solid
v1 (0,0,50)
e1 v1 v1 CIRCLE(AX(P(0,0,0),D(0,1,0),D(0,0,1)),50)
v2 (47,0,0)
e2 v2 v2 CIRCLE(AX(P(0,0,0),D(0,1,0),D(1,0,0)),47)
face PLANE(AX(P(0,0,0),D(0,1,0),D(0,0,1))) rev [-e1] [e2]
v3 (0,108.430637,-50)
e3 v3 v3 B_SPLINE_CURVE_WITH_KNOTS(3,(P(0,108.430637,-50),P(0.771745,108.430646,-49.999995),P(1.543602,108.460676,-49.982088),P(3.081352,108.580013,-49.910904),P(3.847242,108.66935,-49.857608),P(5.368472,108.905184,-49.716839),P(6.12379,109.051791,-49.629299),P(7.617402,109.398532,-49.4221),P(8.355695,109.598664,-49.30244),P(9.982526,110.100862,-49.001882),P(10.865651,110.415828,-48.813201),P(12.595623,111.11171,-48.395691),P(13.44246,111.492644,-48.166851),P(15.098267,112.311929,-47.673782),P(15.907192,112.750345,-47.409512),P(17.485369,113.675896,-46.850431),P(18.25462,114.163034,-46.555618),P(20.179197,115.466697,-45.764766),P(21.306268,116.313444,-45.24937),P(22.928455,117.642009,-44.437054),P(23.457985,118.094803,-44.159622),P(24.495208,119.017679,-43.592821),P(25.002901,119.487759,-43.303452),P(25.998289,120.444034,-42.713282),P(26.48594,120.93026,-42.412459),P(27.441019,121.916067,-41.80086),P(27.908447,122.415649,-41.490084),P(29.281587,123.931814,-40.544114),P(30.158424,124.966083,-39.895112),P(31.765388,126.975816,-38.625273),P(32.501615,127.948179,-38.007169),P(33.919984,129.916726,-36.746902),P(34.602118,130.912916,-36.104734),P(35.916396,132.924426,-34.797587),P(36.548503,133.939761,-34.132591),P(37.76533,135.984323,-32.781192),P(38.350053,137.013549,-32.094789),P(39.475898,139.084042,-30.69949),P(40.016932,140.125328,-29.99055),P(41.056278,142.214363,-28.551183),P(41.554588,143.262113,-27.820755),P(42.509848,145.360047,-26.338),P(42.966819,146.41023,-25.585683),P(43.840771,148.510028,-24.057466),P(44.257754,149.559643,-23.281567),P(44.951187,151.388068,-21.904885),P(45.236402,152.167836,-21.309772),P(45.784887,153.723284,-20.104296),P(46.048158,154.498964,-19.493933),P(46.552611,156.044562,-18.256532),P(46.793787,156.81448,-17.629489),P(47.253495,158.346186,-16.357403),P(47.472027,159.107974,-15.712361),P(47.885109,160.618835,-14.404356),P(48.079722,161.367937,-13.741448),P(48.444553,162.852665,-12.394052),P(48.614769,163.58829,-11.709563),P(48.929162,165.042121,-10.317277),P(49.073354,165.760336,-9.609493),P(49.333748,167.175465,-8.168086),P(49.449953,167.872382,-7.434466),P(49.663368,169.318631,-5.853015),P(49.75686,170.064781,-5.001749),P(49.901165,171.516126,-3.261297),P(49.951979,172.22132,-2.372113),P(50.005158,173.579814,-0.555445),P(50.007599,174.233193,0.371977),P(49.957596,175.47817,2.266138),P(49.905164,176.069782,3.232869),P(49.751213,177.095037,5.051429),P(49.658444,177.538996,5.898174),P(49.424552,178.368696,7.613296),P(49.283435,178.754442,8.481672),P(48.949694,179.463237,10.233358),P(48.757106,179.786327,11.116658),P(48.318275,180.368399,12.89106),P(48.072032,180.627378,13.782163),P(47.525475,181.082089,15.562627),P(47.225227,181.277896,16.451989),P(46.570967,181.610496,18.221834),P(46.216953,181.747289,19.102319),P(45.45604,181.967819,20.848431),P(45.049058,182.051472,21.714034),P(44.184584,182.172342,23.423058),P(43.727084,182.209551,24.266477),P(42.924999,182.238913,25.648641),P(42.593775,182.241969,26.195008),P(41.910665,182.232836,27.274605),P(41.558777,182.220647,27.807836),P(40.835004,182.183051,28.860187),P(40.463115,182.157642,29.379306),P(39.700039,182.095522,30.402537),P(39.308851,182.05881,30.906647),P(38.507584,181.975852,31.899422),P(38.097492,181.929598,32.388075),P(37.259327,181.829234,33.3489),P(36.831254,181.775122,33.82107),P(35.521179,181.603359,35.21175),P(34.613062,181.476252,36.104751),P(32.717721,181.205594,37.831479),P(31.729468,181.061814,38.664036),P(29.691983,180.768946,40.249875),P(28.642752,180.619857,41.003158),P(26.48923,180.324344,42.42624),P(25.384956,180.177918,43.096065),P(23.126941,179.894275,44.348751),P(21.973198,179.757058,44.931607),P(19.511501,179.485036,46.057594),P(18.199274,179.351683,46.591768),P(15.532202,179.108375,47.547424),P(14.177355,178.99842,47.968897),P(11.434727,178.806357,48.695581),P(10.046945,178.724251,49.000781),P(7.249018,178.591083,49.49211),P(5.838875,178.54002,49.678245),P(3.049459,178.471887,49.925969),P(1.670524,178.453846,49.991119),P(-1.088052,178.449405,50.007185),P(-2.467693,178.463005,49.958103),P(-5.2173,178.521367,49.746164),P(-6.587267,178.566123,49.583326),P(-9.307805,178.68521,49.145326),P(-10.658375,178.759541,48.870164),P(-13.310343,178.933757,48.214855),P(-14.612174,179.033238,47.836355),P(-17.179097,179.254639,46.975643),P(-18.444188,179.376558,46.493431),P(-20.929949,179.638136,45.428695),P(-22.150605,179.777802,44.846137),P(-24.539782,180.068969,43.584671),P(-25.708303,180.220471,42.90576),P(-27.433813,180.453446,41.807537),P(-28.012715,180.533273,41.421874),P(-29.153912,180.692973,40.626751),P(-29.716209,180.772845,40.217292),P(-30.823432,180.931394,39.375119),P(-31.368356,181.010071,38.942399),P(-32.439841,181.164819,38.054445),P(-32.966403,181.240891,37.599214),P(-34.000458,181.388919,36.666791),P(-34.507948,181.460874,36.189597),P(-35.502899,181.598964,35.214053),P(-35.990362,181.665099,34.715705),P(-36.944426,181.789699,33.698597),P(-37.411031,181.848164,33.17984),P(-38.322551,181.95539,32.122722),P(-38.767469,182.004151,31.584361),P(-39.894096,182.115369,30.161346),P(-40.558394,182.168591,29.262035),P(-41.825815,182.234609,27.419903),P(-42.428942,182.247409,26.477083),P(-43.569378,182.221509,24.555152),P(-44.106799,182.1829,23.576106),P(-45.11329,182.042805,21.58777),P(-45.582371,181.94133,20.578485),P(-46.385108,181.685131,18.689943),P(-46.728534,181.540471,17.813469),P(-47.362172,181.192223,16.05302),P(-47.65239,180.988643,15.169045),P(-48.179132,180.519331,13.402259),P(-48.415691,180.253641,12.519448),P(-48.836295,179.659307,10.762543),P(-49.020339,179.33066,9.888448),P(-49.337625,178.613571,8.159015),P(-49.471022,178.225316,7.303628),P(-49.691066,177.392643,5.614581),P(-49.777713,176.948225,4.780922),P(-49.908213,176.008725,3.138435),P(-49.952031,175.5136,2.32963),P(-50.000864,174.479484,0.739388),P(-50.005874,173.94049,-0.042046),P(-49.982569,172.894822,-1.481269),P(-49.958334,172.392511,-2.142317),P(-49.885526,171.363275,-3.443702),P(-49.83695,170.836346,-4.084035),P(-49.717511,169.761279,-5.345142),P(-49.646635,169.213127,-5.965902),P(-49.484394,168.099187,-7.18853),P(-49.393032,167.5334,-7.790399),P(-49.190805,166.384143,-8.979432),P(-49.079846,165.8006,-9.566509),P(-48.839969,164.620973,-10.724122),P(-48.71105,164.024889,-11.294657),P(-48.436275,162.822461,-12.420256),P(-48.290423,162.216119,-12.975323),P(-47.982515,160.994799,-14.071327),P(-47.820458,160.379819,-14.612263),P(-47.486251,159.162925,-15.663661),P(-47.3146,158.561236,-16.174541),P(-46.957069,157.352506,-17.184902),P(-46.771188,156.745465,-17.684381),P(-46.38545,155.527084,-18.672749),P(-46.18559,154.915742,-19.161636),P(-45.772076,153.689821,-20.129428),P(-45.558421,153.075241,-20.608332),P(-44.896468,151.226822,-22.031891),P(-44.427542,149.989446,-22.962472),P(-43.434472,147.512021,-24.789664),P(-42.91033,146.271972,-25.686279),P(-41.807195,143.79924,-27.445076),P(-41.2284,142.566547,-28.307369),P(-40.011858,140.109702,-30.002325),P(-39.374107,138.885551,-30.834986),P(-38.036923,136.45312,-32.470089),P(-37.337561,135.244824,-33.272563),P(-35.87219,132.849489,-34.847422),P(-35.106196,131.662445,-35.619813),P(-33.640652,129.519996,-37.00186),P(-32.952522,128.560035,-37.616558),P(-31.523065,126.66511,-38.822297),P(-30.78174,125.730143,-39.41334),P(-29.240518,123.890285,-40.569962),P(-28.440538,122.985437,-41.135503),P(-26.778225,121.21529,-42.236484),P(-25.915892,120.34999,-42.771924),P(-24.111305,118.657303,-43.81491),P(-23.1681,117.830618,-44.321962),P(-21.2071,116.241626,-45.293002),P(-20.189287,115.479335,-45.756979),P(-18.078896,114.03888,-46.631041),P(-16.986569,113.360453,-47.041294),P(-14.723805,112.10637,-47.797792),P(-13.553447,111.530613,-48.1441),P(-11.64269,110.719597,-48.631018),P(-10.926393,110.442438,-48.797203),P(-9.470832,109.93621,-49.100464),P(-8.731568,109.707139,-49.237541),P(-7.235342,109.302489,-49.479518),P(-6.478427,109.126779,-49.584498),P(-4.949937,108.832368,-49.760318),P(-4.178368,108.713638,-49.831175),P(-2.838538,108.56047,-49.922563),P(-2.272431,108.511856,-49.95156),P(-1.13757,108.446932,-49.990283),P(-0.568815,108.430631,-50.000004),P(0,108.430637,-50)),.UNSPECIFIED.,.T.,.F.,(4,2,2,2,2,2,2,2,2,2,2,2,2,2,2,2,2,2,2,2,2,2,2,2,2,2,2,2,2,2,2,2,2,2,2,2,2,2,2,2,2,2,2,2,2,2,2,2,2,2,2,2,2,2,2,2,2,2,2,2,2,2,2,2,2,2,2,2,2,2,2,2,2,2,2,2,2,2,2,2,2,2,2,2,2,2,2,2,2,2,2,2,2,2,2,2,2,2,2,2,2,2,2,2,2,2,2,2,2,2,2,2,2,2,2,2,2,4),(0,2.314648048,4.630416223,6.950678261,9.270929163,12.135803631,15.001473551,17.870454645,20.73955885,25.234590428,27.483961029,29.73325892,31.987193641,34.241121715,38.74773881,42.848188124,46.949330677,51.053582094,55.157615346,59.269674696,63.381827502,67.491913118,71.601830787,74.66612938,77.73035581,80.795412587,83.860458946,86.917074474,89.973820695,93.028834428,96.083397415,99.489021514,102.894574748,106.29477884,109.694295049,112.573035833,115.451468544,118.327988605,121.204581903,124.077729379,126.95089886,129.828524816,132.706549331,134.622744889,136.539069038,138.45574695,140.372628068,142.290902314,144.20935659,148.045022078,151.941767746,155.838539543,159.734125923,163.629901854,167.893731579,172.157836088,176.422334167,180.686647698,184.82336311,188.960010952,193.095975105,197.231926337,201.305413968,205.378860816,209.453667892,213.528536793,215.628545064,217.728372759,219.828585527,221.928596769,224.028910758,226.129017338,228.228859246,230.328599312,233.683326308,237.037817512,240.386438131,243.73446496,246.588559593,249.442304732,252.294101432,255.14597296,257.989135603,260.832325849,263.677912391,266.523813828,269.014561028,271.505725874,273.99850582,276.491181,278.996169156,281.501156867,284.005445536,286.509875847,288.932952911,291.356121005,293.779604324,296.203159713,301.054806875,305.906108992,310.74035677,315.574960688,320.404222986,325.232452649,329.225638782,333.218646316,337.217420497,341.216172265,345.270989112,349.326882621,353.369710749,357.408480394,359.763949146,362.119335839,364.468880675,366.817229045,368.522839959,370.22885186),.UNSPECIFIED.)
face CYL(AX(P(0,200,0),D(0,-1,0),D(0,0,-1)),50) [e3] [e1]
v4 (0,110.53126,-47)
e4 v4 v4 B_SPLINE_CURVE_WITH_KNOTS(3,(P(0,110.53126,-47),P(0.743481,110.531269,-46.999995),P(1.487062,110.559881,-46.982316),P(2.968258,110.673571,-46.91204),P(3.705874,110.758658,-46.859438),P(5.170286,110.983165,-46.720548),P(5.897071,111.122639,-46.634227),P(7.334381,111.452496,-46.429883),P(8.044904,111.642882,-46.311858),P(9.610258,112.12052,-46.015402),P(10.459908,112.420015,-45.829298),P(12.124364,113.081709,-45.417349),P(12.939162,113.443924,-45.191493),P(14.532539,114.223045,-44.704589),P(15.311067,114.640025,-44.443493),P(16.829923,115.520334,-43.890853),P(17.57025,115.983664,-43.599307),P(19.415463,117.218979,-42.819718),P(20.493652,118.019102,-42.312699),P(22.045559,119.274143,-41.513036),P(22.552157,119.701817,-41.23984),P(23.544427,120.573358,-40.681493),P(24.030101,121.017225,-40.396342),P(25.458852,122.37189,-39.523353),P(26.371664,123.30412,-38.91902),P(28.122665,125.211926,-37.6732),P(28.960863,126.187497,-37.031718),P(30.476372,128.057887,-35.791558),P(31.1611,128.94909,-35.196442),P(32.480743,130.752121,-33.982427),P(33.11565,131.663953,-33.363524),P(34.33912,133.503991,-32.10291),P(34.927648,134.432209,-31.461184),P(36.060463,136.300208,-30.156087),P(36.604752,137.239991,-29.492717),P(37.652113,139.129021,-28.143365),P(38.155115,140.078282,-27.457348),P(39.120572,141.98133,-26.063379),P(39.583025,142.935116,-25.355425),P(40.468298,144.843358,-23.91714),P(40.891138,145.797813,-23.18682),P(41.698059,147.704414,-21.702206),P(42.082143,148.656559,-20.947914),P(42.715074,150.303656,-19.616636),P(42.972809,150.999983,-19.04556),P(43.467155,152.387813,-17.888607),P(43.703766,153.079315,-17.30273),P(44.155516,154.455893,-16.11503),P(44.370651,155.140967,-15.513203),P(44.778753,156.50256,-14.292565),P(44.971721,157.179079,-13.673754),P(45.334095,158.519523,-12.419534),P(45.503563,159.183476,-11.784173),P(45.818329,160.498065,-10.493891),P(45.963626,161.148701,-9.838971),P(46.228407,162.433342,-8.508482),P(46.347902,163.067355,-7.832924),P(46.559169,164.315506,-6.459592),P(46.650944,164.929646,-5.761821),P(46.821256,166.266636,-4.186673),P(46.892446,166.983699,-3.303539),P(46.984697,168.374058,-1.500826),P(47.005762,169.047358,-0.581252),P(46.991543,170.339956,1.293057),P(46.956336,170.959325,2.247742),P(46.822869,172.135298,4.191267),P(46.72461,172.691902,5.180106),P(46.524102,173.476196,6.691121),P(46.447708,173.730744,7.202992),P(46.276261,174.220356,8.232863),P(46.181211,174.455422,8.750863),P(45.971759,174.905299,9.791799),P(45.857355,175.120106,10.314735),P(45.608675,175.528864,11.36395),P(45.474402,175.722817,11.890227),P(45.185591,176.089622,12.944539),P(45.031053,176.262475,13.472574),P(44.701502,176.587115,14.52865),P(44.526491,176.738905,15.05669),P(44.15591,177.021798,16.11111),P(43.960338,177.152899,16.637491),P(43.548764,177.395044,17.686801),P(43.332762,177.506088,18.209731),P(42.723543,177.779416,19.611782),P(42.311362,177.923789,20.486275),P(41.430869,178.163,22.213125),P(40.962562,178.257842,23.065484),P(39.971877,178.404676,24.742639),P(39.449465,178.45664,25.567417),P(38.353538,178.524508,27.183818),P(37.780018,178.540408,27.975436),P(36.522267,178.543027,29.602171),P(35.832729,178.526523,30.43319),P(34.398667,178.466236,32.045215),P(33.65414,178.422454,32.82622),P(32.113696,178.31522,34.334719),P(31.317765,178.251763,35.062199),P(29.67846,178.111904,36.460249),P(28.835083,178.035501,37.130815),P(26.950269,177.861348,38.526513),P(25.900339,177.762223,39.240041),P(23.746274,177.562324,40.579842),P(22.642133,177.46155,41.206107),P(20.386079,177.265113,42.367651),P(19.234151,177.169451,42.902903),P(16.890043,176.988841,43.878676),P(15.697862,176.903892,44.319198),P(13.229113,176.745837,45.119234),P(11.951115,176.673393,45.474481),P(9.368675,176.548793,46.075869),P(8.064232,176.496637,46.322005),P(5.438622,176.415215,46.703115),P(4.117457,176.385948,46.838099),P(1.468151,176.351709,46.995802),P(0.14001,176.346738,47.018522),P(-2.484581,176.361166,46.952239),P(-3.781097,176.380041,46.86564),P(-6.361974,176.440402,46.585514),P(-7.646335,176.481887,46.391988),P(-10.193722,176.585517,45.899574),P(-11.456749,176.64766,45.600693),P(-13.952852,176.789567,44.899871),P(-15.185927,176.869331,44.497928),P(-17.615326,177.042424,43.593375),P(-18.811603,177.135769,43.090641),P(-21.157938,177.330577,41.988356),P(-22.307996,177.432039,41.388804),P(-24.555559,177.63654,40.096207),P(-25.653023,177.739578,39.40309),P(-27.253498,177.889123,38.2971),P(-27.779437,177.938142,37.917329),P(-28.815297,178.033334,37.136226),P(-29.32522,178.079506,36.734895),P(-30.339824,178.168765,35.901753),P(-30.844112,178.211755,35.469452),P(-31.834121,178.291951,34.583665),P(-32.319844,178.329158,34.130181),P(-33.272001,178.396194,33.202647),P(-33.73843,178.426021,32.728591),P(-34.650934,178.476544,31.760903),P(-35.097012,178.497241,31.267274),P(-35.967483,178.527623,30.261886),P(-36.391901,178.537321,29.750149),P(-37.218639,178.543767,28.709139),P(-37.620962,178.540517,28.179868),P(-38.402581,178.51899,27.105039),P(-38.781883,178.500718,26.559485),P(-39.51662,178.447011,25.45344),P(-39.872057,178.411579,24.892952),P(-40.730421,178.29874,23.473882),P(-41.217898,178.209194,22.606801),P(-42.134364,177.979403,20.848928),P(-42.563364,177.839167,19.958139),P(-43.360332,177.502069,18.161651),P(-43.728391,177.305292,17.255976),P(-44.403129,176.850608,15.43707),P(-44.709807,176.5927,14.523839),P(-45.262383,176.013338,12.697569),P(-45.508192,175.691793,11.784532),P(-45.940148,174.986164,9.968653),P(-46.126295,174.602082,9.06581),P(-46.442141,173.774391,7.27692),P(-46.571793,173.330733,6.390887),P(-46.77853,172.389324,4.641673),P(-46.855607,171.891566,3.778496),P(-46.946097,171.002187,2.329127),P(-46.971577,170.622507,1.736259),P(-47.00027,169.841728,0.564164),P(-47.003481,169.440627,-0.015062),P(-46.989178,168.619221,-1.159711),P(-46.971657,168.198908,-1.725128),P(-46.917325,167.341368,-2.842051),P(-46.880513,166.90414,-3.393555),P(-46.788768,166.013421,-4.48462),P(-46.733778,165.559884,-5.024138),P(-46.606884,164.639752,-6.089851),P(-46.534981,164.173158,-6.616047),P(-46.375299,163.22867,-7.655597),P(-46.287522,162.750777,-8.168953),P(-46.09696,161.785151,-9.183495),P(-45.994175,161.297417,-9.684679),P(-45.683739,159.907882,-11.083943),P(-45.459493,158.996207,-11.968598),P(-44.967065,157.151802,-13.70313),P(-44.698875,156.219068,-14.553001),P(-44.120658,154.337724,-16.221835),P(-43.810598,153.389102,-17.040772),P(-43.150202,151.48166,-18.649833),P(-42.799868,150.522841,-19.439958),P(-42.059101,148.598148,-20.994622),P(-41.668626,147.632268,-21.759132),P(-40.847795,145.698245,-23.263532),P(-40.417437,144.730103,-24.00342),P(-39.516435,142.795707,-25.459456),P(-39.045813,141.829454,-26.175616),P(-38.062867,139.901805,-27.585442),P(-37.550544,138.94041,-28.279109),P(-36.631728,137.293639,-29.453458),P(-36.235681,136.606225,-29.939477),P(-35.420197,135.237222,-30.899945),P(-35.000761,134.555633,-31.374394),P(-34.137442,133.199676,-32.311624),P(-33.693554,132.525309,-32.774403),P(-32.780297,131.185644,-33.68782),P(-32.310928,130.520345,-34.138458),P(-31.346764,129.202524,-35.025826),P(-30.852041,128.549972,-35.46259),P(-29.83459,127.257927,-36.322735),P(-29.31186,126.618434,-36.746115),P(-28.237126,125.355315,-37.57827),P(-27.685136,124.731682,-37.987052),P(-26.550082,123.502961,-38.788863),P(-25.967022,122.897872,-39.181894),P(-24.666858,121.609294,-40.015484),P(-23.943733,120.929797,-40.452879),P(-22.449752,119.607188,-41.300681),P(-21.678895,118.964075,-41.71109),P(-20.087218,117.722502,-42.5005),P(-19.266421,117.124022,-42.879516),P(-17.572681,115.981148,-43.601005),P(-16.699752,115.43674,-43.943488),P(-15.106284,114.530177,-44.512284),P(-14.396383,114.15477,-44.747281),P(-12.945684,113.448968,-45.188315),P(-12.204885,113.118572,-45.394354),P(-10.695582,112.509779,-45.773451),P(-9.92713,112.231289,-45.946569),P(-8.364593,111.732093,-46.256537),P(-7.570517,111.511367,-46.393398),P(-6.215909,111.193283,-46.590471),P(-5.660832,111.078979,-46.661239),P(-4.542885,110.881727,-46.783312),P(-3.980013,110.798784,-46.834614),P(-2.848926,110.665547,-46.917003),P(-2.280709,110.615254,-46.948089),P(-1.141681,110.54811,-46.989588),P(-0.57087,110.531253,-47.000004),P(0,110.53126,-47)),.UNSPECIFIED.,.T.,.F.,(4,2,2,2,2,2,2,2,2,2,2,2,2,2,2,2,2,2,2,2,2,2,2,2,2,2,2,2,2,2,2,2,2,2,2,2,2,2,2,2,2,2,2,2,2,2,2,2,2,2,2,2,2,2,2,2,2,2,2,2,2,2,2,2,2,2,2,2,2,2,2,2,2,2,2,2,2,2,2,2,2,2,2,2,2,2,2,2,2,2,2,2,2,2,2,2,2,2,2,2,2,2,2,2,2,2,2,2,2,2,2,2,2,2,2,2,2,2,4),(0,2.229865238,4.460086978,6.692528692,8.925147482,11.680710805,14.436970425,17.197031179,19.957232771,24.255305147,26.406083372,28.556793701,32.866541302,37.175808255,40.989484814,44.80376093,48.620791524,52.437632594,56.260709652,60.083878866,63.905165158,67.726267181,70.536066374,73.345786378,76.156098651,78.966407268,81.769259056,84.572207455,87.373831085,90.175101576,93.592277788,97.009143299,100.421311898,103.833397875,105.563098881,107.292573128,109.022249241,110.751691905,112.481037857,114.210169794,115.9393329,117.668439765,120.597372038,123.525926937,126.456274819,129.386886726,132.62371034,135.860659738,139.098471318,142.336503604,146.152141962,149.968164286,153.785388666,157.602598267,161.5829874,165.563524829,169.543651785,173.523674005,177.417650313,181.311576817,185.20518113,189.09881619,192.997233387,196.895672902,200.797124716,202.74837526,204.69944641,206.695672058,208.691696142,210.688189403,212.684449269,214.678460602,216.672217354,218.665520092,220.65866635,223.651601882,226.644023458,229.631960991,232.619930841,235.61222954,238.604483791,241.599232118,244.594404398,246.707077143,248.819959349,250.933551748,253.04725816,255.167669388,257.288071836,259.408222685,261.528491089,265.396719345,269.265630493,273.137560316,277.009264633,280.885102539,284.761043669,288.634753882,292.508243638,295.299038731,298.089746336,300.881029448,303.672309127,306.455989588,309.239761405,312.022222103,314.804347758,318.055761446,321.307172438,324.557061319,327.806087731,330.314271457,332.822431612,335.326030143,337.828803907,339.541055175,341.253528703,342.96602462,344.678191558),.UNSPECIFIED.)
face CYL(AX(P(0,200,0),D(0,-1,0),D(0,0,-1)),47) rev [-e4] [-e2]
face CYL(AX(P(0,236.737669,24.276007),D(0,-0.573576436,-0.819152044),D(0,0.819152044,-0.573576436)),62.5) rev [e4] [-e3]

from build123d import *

# Parameters (mm, degrees)
EXTRUDE_1_OUTLINE_R      = 50
EXTRUDE_1_OUTLINE_R_2    = 47
EXTRUDE_1_DEPTH          = 200
CUT_EXTRUDE_1_DEPTH      = 213.132034356
CUT_EXTRUDE_1_DEPTH_BACK = 213.132034356
SKETCH_2_R               = 62.5


# Read off the part's stored shape, not the designer's step: Вытянуть-Тонкостенный1
with BuildPart() as part:
    # Вытянуть-Тонкостенный1 outline → Вытянуть-Тонкостенный1 (new body)
    with BuildSketch(Plane(origin=(0, 0, 0), x_dir=(1, 0, 0), z_dir=(0, 1, 0))):
        Circle(EXTRUDE_1_OUTLINE_R)
        Circle(EXTRUDE_1_OUTLINE_R_2, mode=Mode.SUBTRACT)
    extrude(amount=EXTRUDE_1_DEPTH)

    # Эскиз2 → Вырез-Вытянуть1 (cut, two sides: drawn at the far end of the back side and taken through both)
    with BuildSketch(Plane(origin=(0, 0, 0), x_dir=(1, 0, 0), z_dir=(0, -0.5735764363510444, -0.819152044288993)).offset(-CUT_EXTRUDE_1_DEPTH_BACK)):
        with Locations((0, -180)):
            Circle(SKETCH_2_R)
    extrude(amount=CUT_EXTRUDE_1_DEPTH + CUT_EXTRUDE_1_DEPTH_BACK, mode=Mode.SUBTRACT)


solid = part.part
